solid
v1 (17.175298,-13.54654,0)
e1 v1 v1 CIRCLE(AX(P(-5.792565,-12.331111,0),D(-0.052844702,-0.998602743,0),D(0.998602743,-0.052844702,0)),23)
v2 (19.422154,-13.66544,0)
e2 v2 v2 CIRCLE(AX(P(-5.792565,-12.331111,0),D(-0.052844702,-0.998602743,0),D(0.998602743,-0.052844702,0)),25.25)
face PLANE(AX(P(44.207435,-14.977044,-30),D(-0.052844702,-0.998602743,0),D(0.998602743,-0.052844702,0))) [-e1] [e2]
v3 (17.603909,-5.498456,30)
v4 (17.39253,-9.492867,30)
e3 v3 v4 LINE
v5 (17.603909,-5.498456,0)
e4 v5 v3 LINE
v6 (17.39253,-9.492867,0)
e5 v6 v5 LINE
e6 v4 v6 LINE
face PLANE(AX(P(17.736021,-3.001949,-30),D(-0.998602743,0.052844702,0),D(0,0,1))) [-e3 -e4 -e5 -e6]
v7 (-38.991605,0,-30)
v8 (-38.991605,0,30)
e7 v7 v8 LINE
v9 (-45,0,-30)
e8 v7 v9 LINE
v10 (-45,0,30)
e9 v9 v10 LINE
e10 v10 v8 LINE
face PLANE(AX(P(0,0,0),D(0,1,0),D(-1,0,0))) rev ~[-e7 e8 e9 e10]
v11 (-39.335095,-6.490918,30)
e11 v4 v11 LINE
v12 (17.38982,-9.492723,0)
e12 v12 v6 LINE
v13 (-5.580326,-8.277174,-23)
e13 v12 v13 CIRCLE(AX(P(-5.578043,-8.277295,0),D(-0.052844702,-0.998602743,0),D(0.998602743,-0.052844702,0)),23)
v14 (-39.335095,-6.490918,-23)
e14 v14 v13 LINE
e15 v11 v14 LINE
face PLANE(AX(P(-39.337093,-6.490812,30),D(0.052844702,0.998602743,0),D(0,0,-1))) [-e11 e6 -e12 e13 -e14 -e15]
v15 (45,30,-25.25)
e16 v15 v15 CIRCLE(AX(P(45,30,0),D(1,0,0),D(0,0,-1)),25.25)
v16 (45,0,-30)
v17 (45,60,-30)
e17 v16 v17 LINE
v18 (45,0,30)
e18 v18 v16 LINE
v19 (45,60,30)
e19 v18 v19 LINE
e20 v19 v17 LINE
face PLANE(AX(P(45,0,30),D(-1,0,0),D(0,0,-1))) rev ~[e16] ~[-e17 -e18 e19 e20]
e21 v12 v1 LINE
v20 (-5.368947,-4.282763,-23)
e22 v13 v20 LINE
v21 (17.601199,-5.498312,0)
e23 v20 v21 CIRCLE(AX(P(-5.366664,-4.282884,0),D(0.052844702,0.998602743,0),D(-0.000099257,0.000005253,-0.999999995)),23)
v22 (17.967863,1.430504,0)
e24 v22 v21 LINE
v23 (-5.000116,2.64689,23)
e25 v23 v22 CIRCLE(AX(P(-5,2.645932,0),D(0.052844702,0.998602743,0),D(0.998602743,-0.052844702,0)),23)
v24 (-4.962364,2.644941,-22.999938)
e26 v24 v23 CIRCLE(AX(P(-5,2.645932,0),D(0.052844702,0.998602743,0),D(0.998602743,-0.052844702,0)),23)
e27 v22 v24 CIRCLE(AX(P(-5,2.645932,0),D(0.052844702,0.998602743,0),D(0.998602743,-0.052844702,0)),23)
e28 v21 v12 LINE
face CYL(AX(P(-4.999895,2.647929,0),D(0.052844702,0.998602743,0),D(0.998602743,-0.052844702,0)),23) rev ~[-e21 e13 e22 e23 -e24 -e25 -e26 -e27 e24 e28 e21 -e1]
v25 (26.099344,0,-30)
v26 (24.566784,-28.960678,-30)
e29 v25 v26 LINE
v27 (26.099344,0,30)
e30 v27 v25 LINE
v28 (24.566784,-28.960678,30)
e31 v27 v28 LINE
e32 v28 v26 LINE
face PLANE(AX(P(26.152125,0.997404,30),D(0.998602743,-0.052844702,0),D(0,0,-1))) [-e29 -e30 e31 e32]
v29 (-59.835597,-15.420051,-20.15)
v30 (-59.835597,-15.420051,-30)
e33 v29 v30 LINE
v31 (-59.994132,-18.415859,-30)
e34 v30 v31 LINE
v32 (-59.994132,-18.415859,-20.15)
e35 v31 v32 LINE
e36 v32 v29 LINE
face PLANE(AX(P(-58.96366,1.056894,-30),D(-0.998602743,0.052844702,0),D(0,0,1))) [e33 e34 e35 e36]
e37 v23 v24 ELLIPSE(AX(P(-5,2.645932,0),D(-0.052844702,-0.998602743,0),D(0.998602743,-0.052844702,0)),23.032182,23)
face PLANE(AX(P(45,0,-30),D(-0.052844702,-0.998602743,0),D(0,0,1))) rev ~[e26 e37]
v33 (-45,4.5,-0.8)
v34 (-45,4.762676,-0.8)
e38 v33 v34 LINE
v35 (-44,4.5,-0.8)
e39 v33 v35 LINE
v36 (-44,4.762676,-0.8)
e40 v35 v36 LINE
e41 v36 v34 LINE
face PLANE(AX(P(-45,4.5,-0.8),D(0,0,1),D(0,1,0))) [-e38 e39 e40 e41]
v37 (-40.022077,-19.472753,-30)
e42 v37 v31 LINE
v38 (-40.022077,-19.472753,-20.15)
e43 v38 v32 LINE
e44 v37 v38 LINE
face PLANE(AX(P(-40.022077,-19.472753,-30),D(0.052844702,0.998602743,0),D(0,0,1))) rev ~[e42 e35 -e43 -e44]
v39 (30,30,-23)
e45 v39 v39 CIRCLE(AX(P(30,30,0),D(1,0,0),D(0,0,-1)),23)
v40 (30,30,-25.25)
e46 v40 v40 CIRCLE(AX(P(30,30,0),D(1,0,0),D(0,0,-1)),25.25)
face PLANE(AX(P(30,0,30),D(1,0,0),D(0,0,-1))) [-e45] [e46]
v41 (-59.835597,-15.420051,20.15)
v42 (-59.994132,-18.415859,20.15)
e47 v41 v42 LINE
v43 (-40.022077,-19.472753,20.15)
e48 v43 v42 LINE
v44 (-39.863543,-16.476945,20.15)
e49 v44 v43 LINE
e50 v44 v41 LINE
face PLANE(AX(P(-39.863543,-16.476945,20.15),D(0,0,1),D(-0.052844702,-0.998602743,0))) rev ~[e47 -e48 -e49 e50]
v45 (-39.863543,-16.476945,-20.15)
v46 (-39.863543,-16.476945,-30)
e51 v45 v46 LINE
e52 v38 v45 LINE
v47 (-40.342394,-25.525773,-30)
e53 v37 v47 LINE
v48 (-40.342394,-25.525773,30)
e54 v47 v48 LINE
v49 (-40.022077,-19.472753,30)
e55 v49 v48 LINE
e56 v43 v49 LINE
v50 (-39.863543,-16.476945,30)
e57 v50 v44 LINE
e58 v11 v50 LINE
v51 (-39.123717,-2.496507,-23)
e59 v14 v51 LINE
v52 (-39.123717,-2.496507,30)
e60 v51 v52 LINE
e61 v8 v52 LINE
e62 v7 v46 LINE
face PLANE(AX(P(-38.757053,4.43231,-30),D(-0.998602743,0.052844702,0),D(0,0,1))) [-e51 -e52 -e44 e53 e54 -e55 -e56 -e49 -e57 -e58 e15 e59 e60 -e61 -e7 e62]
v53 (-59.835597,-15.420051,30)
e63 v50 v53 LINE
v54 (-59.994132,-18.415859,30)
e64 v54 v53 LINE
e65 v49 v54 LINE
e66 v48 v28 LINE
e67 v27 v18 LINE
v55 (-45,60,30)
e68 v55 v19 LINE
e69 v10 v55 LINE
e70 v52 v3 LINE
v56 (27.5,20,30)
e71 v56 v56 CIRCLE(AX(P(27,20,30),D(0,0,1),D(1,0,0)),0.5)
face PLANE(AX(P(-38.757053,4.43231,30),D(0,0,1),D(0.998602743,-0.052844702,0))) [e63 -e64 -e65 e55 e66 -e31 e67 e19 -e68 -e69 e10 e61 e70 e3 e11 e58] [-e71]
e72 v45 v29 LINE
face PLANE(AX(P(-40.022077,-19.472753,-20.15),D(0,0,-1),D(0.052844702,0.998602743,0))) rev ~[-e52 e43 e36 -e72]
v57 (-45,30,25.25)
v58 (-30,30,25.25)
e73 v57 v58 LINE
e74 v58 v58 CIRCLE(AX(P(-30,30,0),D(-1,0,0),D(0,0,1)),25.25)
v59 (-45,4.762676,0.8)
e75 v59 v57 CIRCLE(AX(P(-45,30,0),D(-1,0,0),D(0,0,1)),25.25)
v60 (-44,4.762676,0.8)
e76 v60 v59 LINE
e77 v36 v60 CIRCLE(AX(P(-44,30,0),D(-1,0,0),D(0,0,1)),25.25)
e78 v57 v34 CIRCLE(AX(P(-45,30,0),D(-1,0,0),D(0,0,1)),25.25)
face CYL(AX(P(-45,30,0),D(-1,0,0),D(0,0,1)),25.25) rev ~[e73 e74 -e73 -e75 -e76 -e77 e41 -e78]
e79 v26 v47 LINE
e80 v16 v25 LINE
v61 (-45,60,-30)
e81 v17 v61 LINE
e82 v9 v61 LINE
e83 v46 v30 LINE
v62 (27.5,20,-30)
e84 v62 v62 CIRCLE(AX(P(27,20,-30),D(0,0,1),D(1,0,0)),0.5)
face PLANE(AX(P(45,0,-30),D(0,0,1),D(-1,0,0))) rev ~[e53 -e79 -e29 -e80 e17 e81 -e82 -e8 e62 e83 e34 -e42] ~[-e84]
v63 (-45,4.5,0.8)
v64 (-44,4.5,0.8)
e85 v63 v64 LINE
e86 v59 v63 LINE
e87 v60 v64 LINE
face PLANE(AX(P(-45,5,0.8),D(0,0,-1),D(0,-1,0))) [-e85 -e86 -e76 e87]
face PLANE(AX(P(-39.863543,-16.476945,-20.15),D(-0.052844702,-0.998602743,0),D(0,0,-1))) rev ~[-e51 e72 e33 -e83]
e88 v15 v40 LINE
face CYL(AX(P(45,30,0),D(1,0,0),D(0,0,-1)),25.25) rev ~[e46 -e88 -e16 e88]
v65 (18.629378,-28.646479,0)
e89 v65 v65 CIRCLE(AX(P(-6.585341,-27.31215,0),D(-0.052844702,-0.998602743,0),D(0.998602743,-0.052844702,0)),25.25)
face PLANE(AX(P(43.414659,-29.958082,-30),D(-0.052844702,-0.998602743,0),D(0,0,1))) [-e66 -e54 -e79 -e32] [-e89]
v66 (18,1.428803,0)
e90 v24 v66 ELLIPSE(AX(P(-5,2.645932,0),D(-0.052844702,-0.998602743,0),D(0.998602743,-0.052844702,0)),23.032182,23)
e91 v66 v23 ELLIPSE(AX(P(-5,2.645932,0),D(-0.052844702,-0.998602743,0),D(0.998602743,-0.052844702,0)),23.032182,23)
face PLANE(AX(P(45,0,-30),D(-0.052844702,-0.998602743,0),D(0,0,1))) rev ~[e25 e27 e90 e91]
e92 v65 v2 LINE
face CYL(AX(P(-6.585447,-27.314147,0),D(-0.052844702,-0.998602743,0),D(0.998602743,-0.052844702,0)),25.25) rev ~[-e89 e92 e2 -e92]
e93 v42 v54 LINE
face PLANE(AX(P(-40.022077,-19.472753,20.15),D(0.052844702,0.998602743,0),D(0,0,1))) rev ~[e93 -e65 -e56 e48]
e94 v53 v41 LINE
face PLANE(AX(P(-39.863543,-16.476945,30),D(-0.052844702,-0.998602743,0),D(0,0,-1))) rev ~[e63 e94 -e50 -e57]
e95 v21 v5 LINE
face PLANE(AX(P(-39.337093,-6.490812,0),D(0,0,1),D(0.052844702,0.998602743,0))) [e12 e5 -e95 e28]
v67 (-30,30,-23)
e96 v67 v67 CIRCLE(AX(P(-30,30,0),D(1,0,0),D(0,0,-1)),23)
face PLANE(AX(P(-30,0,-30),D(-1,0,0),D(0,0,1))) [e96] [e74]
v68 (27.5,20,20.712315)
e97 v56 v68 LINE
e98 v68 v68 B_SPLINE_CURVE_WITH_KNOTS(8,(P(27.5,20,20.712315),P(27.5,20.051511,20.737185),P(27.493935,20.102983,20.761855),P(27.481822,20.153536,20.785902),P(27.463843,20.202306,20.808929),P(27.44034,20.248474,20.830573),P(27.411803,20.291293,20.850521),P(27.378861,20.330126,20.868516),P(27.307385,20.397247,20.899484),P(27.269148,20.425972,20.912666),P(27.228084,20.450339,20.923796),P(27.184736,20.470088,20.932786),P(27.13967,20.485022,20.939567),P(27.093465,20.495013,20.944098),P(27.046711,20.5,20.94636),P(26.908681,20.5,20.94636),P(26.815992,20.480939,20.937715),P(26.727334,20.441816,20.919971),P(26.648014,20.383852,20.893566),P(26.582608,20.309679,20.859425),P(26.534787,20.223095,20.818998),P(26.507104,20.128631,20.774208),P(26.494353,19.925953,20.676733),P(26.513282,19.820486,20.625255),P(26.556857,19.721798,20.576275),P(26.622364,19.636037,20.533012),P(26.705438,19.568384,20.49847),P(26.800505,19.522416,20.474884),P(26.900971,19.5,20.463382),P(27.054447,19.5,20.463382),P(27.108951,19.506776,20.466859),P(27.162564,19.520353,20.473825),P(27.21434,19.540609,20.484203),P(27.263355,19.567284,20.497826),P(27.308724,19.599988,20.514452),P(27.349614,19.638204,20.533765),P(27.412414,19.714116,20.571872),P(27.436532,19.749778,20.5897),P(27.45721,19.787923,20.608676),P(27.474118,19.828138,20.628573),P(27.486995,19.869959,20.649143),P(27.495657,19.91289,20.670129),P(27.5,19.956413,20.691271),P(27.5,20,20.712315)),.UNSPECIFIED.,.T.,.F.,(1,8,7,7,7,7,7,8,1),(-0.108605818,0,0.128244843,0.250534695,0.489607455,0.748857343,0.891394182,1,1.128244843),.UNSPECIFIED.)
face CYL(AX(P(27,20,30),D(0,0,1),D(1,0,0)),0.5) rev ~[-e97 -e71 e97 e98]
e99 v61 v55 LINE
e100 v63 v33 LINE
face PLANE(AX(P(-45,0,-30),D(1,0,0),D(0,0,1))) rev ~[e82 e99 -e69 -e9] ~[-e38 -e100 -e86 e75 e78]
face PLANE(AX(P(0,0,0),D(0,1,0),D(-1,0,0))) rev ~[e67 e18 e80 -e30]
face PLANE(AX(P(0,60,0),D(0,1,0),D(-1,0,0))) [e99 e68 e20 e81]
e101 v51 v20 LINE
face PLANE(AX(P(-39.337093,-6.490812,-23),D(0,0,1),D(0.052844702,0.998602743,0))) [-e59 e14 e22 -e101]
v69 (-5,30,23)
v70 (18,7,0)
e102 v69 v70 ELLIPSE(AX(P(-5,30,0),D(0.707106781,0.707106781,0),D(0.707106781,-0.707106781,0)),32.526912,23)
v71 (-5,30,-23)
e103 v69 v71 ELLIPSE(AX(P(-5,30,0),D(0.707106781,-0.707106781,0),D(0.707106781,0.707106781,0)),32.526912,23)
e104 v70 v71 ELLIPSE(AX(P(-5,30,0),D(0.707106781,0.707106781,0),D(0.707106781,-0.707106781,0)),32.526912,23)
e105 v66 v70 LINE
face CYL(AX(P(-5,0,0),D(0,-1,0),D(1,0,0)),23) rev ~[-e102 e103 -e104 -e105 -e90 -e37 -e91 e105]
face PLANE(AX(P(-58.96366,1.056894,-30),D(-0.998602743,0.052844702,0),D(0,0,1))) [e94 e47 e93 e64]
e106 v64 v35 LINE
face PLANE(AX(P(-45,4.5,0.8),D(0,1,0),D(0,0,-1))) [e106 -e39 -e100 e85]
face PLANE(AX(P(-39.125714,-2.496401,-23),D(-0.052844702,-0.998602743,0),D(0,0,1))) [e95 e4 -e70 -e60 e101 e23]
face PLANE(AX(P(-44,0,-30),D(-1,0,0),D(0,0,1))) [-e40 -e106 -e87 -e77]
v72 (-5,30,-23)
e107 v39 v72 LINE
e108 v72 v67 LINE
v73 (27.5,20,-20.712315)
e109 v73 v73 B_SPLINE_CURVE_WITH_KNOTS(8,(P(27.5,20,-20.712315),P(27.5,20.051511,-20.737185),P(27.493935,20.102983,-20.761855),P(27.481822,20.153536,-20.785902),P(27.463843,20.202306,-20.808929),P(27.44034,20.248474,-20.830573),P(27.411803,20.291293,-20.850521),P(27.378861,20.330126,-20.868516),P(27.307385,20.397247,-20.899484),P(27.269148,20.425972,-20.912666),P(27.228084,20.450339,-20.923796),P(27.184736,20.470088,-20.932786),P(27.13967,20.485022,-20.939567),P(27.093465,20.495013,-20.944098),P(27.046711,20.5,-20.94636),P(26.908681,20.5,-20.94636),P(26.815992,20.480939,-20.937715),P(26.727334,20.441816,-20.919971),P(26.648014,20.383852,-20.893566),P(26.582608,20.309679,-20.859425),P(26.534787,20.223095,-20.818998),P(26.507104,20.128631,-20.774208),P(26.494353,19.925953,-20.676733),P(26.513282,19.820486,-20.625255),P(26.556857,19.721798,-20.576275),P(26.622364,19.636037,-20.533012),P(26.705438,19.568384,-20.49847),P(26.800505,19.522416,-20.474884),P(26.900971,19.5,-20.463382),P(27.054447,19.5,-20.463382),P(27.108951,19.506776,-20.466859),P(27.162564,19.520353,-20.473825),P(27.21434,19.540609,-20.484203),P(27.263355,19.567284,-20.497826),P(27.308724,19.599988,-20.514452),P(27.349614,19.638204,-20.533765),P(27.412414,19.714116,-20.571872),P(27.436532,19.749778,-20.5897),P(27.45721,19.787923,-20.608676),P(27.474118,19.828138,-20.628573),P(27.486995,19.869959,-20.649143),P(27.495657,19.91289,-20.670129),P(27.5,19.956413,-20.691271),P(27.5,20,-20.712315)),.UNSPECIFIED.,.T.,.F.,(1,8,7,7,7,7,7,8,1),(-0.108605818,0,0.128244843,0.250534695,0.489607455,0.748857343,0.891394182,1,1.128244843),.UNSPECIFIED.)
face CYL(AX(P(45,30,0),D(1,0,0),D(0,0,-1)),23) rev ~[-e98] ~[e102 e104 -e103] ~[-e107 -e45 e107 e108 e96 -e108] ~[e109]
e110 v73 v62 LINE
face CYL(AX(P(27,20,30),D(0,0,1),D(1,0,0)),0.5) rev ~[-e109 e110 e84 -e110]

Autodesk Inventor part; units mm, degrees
ref_plane "YZ Plane" through (0, 0, 0) normal (1, 0, 0) x (0, 1, 0)
ref_plane "XZ Plane" through (0, 0, 0) normal (0, 1, 0) x (-1, 0, 0)
sketch "Esquisse1" plane through (0, 0, 0) normal (0, 1, 0) x (-1, 0, 0)
  line L0 (45, 30) -> (-45, 30)
  line L1 (-45, 30) -> (-45, -30)
  line L2 (-45, -30) -> (45, -30)
  line L3 (45, -30) -> (45, 30)
  point P0 (0, 0)
  dimension "d0" = 60
  dimension "d1" = 90
  dimension "d2" = 30
  dimension "d3" = 45
extrude "Extrusion1" add sketch "Esquisse1" along normal blind 60
sketch "Esquisse3" plane through (45, 0, 30) normal (1, 0, 0) x (0, 0, -1)
  circle A0 centre (30, 30) radius 23
  line L0 (0, 0) -> (0, 60) projected
  point P0 (30, 0)
  dimension "d7" = 30
  dimension "d8" = 30
  dimension "d9" = 46
extrude "Extrusion2" cut sketch "Esquisse3" against normal through all
sketch "Esquisse4" plane through (45, 0, 30) normal (1, 0, 0) x (0, 0, -1)
  circle A0 centre (30, 30) radius 25.25
  circle A1 centre (30, 30) radius 23 projected
  point P0 (30, 0)
  dimension "d12" = 50.5
extrude "Extrusion3" cut sketch "Esquisse4" against normal blind 15
sketch "Esquisse5" plane through (-45, 0, -30) normal (-1, 0, 0) x (0, 0, 1)
  circle A0 centre (30, 30) radius 25.25
  circle A1 centre (30, 30) radius 23 projected
  point P0 (30, 0)
  dimension "d15" = 50.5
extrude "Extrusion4" cut sketch "Esquisse5" against normal blind 15
sketch "Esquisse6" plane through (0, 0, 0) normal (0, -1, 0) x (1, 0, 0)
  circle A0 centre (-5, 0) radius 23
  point P0 (0, 0)
  dimension "d18" = 46
  dimension "d19" = 5
extrude "Extrusion5" cut sketch "Esquisse6" against normal blind 30
sketch "Esquisse7" plane through (-45, 0, 30) normal (0, 0, 1) x (1, 0, 0)
  circle A0 centre (72, 20) radius 0.5
  line L0 (90, 0) -> (90, 60) projected
  line L1 (0, 60) -> (90, 60) projected
  point P0 (45, 0)
  dimension "d22" = 1
  dimension "d23" = 18
  dimension "d24" = 40
extrude "Extrusion6" cut sketch "Esquisse7" against normal through all
sketch "Esquisse8" plane through (-45, 0, -30) normal (-1, 0, 0) x (0, 0, 1)
  line L0 (29.2, 5) -> (30.8, 5)
  line L1 (30.8, 5) -> (30.8, 4.5)
  line L2 (30.8, 4.5) -> (29.2, 4.5)
  line L3 (29.2, 4.5) -> (29.2, 5)
  line L4 (0, 0) -> (60, 0) projected
  point P0 (30, 0)
  dimension "d27" = 0.5
  dimension "d28" = 1.6
  dimension "d29" = 0.8
  dimension "d30" = 4.5
extrude "Extrusion7" cut sketch "Esquisse8" against normal blind 1
ref_plane "Plan de construction2" through (45, 0, -30) normal (-0.0528447, -0.9986027, 0) x (0, 0, 1)
sketch "Esquisse9" plane through (45, 0, -30) normal (-0.0528447, -0.9986027, 0) x (0, 0, 1)
  line L0 (0, 83.874247) -> (60, 83.874247)
  line L1 (60, 83.874247) -> (60, 18.874247)
  line L2 (60, 18.874247) -> (0, 18.874247)
  line L3 (0, 18.874247) -> (0, 83.874247)
  line L4 (60, 89.874247) -> (60, 93.044928)
  line L5 (0, 89.874247) -> (60, 89.874247)
  point P0 (30, 44.937123)
  dimension "d33" = 60
  dimension "d34" = 0
  dimension "d35" = 65
  dimension "d36" = 6
extrude "Extrusion8" add sketch "Esquisse9" along normal blind 30
sketch "Esquisse11" plane through (45, 0, -30) normal (0.0528447, 0.9986027, 0) x (0.9986027, -0.0528447, 0)
  circle A0 centre (-50.069961, -30) radius 23
  ellipse E0 centre (-50.069961, -30) end of major axis (-73.102142, -30) minor radius 23
  point P0 (-44.937123, -30)
  dimension "d39" = 46
sketch "Esquisse11 outline for Extrusion9" plane through (45, 0, -30) normal (0.0528447, 0.9986027, 0) x (0.9986027, -0.0528447, 0)
  circle A0 centre (-50.069961, -30) radius 23
extrude "Extrusion9" cut sketch "Esquisse11 outline for Extrusion9" against normal blind 30
sketch "Esquisse13" plane through (43.414659, -29.958082, -30) normal (-0.0528447, -0.9986027, 0) x (0.9986027, -0.0528447, 0)
  circle A0 centre (-50.069961, 30) radius 25.25
  circle A1 centre (-50.069961, 30) radius 23
  point P0 (-44.937123, 30)
  dimension "d42" = 50.5
extrude "Extrusion10" cut sketch "Esquisse13" against normal blind 15
sketch "Esquisse15" plane through (-38.991605, 0, -30) normal (-0.9986027, 0.0528447, 0) x (0, 0, 1)
  line L0 (60, 0) -> (60, -25.56149)
  line L1 (60, -6.5) -> (7, -6.5)
  line L2 (7, -6.5) -> (7, -2.5)
  line L3 (7, -2.5) -> (60, -2.5)
  line L4 (60, -2.5) -> (60, -6.5)
  point P0 (30, 2.060499)
  dimension "d45" = 53
  dimension "d46" = 4
  dimension "d47" = 2.5
extrude "Extrusion11" cut sketch "Esquisse15" against normal blind 33.8
sketch "Esquisse16" plane through (-38.991605, 0, -30) normal (-0.9986027, 0.0528447, 0) x (0, 0, 1)
  line L0 (60, -2.5) -> (60, -6.5) projected
  line L1 (7, -2.5) -> (60, -2.5) projected
  line L2 (60, -6.5) -> (30, -6.5)
  line L3 (30, -6.5) -> (30, -2.5)
  line L4 (30, -2.5) -> (60, -2.5)
  line L5 (60, -2.5) -> (60, -6.5)
  point P0 (30, 2.060499)
  dimension "d50" = 30
extrude "Extrusion12" cut sketch "Esquisse16" against normal blind 56.805
sketch "Esquisse17" plane through (-38.991605, 0, -30) normal (-0.9986027, 0.0528447, 0) x (0, 0, 1)
  line L0 (50.15, -19.5) -> (60, -19.5)
  line L1 (60, -19.5) -> (60, -16.5)
  line L2 (60, -16.5) -> (50.15, -16.5)
  line L3 (50.15, -16.5) -> (50.15, -19.5)
  line L4 (0, -19.5) -> (9.85, -19.5)
  line L5 (9.85, -19.5) -> (9.85, -16.5)
  line L6 (9.85, -16.5) -> (0, -16.5)
  line L7 (0, -16.5) -> (0, -19.5)
  line L8 (60, 3.439711) -> (60, -25.56149)
  line L9 (60, -6.5) -> (7, -6.5)
  line L10 (0, 0) -> (0, -25.56149)
  point P0 (30, 2.060499)
  dimension "d53" = 3
  dimension "d54" = 3
  dimension "d55" = 0
  dimension "d56" = 40.3
  dimension "d57" = 13
  dimension "d58" = 13
  dimension "d60" = 0
extrude "Extrusion13" add sketch "Esquisse17" along normal blind 20
equation "\"d2\" = 0.5 * d0"
equation "\"d3\" = 0.5 * d1"
equation "\"d29\" = 0.5 * d28"
equation "\"d58\" = d57"
properties part number "Trappe Lancement 2"
